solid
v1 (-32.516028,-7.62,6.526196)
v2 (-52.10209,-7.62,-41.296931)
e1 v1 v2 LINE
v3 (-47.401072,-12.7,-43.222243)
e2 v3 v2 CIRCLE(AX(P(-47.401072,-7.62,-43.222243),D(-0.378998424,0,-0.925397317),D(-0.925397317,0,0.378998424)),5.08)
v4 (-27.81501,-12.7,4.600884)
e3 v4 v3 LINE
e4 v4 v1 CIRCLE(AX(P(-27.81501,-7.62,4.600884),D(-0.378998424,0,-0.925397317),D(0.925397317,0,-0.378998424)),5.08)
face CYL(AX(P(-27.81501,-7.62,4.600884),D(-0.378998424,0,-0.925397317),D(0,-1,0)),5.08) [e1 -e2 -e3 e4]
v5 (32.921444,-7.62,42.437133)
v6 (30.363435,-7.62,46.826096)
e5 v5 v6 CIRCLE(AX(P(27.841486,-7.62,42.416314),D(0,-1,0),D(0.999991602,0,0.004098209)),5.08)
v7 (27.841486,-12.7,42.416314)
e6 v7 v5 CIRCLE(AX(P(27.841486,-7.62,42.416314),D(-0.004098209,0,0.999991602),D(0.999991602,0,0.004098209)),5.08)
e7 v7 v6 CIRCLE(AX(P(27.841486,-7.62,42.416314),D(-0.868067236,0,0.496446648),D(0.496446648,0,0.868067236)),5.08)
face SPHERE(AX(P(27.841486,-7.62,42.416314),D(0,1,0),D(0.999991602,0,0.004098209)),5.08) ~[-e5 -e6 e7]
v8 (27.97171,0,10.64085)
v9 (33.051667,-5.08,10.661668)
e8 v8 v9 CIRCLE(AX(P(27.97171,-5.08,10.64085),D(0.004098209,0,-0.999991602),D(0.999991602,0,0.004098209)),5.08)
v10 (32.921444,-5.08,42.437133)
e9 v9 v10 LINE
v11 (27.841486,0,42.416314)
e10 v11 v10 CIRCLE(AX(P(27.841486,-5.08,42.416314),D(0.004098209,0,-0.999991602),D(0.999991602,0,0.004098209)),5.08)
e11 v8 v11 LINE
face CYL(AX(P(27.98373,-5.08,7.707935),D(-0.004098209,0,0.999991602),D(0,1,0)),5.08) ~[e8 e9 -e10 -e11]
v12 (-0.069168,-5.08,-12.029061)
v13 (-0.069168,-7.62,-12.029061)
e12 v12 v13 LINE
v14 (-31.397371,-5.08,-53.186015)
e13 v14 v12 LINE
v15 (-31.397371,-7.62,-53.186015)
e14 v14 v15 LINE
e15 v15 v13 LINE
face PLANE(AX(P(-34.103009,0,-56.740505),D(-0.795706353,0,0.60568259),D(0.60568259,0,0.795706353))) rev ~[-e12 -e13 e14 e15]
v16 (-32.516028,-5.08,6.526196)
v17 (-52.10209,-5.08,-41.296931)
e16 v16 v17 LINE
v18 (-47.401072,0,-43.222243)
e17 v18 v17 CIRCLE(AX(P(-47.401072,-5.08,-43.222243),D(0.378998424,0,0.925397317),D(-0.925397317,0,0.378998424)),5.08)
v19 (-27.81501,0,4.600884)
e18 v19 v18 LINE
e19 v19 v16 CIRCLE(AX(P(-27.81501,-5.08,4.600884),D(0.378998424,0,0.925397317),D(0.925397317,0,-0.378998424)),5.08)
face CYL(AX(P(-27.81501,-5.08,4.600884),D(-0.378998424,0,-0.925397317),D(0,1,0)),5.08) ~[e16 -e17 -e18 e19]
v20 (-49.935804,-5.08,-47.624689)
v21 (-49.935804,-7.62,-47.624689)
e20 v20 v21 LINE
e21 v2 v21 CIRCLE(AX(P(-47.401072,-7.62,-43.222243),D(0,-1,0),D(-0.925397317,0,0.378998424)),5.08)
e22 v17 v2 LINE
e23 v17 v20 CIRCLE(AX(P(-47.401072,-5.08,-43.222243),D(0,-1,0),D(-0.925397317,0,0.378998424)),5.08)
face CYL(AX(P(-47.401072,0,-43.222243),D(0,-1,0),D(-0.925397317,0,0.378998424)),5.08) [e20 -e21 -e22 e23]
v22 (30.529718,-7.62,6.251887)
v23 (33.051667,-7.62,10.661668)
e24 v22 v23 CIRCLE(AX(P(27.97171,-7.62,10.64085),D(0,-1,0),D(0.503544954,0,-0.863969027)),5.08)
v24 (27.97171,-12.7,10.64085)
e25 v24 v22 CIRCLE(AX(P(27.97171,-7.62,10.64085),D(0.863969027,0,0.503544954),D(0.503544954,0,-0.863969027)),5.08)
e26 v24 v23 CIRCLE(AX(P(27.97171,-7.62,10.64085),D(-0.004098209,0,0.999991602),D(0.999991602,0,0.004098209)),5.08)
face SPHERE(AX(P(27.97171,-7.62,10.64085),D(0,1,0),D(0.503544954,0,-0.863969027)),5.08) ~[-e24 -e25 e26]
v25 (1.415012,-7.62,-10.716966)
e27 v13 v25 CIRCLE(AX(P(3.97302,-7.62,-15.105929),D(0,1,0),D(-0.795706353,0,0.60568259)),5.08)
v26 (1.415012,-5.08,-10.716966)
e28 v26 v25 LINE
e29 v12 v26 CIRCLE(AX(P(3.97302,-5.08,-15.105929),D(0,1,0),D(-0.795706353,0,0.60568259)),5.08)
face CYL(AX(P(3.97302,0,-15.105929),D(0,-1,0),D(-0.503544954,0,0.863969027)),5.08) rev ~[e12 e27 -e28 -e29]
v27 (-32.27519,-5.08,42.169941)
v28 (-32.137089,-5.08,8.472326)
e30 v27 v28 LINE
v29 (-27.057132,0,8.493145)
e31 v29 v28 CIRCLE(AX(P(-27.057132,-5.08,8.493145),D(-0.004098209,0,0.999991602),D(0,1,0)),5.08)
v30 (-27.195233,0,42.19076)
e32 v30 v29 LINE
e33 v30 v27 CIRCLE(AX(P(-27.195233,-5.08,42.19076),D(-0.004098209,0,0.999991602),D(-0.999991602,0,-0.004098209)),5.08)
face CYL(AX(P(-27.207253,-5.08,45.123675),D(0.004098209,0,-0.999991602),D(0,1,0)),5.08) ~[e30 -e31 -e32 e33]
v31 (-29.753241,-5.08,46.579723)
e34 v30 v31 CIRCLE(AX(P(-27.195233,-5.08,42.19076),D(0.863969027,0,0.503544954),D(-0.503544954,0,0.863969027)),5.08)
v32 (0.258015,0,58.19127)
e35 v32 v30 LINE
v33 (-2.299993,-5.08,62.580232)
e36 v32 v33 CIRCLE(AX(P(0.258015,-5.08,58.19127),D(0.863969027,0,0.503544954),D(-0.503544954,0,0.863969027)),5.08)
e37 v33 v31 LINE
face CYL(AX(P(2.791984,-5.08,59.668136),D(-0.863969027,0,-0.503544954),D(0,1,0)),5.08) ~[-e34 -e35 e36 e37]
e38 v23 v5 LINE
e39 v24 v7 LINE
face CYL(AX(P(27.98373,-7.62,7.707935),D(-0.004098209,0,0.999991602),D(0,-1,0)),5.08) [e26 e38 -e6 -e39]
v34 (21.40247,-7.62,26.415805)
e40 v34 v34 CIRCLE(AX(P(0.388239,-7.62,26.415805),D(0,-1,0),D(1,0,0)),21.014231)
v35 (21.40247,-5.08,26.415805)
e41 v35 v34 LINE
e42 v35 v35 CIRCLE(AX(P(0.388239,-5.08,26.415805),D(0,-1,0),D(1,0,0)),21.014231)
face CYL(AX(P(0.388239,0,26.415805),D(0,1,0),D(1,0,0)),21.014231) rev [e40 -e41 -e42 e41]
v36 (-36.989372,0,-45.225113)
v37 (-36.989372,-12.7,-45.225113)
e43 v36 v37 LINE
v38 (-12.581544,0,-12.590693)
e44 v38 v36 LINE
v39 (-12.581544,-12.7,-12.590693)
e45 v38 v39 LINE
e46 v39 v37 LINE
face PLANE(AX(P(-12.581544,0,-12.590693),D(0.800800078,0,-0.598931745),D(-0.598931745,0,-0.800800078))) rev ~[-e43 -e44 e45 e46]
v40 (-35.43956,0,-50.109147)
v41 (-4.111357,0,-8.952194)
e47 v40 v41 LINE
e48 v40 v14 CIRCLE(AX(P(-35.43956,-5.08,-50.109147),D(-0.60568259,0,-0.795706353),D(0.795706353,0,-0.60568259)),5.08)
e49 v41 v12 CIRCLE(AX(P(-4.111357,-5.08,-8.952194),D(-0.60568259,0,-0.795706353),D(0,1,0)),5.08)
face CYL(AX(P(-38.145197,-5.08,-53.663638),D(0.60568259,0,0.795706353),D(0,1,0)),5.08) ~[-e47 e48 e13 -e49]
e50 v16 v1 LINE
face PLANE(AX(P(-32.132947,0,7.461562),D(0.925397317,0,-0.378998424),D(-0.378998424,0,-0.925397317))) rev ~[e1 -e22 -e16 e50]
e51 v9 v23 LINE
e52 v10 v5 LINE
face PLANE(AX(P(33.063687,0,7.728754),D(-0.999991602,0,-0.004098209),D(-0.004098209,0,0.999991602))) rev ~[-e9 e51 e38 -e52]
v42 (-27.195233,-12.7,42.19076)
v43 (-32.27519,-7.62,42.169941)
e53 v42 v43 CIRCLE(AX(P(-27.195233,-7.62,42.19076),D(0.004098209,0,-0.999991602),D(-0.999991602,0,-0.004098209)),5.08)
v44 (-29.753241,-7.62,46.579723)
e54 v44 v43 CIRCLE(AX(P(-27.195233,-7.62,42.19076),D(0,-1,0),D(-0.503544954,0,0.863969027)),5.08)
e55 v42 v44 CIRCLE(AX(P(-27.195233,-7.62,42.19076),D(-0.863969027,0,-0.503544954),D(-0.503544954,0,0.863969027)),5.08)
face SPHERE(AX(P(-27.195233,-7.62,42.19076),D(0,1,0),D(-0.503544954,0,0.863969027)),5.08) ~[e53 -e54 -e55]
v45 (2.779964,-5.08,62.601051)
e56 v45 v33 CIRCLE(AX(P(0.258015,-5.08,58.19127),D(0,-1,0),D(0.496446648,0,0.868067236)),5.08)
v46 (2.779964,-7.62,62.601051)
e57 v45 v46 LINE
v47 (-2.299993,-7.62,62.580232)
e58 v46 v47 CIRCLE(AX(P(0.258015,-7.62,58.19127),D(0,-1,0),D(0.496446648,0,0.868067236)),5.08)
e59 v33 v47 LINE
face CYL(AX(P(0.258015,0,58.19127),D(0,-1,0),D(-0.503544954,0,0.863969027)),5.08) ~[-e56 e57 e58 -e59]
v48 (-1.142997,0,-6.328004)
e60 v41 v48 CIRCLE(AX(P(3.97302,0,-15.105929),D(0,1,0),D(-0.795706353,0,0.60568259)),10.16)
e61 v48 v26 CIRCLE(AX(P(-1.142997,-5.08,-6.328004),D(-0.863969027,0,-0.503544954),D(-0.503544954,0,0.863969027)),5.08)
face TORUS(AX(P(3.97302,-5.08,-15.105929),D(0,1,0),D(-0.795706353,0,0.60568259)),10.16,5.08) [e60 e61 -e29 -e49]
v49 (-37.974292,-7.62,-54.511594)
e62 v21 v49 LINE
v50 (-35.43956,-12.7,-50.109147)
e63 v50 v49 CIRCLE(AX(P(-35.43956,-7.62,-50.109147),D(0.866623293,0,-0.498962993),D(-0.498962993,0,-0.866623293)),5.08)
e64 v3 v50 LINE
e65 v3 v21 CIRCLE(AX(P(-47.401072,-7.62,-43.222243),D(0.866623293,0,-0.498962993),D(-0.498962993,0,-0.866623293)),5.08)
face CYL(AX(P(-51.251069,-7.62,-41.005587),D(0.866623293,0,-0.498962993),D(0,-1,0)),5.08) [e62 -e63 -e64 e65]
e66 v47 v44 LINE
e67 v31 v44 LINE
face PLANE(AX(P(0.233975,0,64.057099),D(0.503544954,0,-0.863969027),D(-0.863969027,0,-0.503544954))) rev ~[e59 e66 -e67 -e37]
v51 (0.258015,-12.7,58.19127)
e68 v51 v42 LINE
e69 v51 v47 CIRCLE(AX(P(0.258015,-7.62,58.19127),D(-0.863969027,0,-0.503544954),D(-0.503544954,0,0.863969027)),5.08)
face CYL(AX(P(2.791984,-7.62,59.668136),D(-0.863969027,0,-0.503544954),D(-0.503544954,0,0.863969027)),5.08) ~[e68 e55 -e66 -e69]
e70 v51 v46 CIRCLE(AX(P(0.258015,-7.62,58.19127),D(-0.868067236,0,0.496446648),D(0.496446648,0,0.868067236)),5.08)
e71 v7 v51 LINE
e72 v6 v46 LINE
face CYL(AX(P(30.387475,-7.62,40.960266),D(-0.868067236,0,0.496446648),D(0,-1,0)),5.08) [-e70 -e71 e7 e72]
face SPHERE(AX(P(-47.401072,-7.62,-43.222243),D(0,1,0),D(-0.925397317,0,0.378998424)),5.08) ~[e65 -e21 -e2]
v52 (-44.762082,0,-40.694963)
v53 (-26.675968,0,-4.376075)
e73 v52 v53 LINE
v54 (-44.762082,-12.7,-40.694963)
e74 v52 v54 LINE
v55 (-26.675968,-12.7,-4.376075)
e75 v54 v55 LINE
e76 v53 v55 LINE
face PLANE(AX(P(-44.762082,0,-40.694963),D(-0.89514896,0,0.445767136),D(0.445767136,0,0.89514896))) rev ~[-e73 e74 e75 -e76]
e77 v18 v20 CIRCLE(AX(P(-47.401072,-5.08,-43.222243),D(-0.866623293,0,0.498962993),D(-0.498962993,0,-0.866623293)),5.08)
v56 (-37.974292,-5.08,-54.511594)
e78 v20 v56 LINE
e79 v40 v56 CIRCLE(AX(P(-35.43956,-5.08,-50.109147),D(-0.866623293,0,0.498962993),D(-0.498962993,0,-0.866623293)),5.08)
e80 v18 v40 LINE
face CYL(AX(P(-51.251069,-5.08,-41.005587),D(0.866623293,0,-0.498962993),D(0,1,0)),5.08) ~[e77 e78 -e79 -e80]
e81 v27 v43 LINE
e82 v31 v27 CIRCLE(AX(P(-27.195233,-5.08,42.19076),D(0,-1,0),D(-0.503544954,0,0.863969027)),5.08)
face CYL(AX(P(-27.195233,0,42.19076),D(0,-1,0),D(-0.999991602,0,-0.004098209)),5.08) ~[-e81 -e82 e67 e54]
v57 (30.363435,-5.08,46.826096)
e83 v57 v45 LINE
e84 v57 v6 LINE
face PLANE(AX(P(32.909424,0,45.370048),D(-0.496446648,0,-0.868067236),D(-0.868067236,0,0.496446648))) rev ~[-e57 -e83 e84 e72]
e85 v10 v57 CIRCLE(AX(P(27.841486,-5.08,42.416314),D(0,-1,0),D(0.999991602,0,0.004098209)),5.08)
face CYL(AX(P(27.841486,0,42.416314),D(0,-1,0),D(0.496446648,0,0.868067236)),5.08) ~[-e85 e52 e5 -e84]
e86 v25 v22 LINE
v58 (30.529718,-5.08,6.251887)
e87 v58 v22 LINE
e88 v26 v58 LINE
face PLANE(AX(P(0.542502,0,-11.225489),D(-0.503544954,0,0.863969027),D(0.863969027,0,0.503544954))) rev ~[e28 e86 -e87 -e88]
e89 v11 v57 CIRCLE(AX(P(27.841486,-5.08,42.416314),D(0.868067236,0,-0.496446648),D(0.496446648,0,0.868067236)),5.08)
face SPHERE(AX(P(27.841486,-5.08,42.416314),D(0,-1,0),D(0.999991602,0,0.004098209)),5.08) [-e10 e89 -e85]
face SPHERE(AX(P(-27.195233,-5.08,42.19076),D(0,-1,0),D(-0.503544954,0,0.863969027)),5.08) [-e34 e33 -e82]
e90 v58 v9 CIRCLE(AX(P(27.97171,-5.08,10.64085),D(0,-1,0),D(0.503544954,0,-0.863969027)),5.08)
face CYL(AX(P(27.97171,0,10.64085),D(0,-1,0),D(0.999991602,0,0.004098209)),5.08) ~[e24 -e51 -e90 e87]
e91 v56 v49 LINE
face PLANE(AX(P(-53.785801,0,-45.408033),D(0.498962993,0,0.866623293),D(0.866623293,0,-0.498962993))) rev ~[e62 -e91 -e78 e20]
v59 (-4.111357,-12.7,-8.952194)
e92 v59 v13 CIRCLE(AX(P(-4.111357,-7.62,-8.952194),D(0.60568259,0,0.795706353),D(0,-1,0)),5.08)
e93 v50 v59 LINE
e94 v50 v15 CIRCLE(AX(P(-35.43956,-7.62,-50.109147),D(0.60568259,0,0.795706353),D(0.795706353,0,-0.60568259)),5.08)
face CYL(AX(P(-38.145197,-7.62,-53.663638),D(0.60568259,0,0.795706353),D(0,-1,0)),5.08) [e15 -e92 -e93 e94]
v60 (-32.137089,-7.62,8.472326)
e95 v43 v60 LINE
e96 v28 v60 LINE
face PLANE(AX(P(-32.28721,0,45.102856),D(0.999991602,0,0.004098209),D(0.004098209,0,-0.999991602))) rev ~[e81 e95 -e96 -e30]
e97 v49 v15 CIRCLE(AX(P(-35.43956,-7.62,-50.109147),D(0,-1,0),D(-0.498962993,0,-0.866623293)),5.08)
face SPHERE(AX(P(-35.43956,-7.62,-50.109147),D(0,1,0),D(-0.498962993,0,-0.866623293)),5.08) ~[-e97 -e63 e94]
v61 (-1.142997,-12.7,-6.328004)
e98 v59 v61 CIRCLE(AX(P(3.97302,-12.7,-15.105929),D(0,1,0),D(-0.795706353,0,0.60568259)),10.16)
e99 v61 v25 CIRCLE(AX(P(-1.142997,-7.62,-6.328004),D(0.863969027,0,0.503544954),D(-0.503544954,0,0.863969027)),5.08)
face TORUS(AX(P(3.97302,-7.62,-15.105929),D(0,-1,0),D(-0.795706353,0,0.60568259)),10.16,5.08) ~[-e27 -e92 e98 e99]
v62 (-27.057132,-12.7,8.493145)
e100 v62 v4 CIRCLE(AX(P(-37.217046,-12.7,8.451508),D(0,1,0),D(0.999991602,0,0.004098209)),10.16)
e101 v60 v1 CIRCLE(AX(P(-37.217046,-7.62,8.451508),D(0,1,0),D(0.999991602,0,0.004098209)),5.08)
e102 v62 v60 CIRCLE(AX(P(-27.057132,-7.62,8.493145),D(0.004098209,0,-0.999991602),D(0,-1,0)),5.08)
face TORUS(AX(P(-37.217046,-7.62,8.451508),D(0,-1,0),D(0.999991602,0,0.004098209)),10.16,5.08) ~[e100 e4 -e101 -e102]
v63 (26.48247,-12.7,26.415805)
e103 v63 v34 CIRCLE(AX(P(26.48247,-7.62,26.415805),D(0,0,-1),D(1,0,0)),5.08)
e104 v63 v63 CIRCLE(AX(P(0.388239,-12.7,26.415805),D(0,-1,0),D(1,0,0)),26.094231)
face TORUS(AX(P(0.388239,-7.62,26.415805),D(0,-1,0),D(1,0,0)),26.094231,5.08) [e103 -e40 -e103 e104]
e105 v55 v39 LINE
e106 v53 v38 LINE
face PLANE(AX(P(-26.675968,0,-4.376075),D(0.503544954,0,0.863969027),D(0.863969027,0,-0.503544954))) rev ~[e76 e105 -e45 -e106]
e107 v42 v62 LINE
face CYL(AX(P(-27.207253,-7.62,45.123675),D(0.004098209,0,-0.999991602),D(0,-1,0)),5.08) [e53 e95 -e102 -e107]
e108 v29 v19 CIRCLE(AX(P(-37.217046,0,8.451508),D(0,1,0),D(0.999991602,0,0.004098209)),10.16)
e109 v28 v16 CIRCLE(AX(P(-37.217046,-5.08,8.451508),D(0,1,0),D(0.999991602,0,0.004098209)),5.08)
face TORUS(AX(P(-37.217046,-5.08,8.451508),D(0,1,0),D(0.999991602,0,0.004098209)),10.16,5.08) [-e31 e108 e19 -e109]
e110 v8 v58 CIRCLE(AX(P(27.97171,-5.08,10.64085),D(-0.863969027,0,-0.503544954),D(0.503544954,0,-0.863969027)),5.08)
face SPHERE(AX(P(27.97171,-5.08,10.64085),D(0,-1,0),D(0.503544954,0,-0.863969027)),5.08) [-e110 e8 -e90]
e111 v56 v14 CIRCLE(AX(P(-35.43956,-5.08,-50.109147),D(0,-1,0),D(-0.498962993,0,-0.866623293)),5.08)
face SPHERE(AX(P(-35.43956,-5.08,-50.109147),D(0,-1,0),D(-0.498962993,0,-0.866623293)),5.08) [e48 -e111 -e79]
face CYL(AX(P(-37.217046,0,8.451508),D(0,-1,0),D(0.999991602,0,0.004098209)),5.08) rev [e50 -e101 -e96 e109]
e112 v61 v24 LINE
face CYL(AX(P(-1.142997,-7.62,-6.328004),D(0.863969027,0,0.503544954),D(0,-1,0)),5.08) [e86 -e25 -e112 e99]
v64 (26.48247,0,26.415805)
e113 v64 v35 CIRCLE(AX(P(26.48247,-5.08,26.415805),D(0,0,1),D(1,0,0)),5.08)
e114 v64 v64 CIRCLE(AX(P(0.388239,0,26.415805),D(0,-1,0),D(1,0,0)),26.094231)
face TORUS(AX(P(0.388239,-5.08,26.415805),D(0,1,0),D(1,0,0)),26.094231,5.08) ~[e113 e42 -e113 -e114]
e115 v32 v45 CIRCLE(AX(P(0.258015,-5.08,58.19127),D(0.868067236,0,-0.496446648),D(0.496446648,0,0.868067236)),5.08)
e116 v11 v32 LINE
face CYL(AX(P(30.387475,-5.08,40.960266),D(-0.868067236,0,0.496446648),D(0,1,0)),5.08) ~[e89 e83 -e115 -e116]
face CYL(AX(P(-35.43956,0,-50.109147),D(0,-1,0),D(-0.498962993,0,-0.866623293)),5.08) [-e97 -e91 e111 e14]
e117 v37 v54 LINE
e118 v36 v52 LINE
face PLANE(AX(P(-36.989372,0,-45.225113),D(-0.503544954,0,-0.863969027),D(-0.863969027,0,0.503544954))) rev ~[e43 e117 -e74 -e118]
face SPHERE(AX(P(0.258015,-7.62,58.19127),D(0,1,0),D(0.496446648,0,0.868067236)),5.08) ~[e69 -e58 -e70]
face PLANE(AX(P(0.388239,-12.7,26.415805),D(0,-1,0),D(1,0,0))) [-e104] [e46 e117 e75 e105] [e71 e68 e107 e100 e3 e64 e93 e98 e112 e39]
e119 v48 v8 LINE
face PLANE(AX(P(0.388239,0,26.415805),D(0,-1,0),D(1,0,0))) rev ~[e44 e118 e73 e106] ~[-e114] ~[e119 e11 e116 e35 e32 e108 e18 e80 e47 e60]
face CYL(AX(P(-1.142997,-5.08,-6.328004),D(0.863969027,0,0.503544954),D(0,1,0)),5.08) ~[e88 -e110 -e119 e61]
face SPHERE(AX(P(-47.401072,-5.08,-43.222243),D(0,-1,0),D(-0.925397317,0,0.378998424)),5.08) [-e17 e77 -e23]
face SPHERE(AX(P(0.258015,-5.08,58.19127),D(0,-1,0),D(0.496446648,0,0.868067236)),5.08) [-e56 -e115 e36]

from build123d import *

# Parameters (mm, degrees)
F0_R     = 21.014231477
F1_DEPTH = 12.7
F2_F1_R  = 5.08
F2_F2_R  = 5.08


with BuildPart() as f1:
    # F0 (on Front) → F1 (new body)
    with BuildSketch(Plane.XZ):
        Polygon((0.2339753428, 64.0570990396), (-32.2872099683, 45.1028561744), (-32.132946793, 7.4615621011), (0.5425016933, -11.2254891068), (33.0636870044, 7.7287537585), (32.9094238292, 45.3700478317), align=None)
        with Locations((0.3882385181, 26.4158049664)):
            Circle(F0_R, mode=Mode.SUBTRACT)
        Polygon((0.5425016933, -11.2254891068), (-32.132946793, 7.4615621011), (-53.7858009338, -45.4080328345), (-34.1030090389, -56.7405054673), align=None)
        Polygon((-44.7620823979, -40.694963187), (-26.6759676173, -4.3760748485), (-12.5815442095, -12.5906931584), (-36.9893716799, -45.2251131573), align=None, mode=Mode.SUBTRACT)
    extrude(amount=F1_DEPTH)

    # F2: fillet of radius 5.08 on 22 edges, made by hand

    # F2_f1
    f2_f1_edges = [f1.edges().sort_by_distance(p)[0] for p in [
        (0.5425016933, -6.35, -11.2254891068),
        (-32.132946793, -6.35, 7.4615621011),
    ]]
    fillet(f2_f1_edges, radius=F2_F1_R)

    # F2_f2
    f2_f2_edges = [f1.edges().sort_by_distance(p)[0] for p in [
        (-20.6259929589, -12.7, 26.4158049664),
        (33.0636870044, -6.35, 7.7287537585),
        (17.2393492596, 0, -1.494106292),
        (17.2393492596, -12.7, -1.494106292),
        (32.9094238292, -6.35, 45.3700478317),
        (32.9865554168, 0, 26.5494007951),
        (32.9865554168, -12.7, 26.5494007951),
        (0.2339753428, -6.35, 64.0570990396),
        (16.571699586, 0, 54.7135734357),
        (16.571699586, -12.7, 54.7135734357),
        (-32.2872099683, -6.35, 45.1028561744),
        (-16.0266173128, 0, 54.579977607),
        (-16.0266173128, -12.7, 54.579977607),
        (-53.7858009338, -6.35, -45.4080328345),
        (-43.1509145264, 0, -19.4409186197),
        (-43.1509145264, -12.7, -19.4409186197),
        (-34.1030090389, -6.35, -56.7405054673),
        (-43.9444049864, 0, -51.0742691509),
        (-43.9444049864, -12.7, -51.0742691509),
        (-20.6259929589, 0, 26.4158049664),
        (-32.2306923288, -12.7, 7.4805945272),
        (-32.2306923288, 0, 7.4805945272),
        (0.6083434765, -12.7, -11.2999662173),
        (0.6083434765, 0, -11.2999662173),
    ]]
    fillet(f2_f2_edges, radius=F2_F2_R)


solid = f1.part
